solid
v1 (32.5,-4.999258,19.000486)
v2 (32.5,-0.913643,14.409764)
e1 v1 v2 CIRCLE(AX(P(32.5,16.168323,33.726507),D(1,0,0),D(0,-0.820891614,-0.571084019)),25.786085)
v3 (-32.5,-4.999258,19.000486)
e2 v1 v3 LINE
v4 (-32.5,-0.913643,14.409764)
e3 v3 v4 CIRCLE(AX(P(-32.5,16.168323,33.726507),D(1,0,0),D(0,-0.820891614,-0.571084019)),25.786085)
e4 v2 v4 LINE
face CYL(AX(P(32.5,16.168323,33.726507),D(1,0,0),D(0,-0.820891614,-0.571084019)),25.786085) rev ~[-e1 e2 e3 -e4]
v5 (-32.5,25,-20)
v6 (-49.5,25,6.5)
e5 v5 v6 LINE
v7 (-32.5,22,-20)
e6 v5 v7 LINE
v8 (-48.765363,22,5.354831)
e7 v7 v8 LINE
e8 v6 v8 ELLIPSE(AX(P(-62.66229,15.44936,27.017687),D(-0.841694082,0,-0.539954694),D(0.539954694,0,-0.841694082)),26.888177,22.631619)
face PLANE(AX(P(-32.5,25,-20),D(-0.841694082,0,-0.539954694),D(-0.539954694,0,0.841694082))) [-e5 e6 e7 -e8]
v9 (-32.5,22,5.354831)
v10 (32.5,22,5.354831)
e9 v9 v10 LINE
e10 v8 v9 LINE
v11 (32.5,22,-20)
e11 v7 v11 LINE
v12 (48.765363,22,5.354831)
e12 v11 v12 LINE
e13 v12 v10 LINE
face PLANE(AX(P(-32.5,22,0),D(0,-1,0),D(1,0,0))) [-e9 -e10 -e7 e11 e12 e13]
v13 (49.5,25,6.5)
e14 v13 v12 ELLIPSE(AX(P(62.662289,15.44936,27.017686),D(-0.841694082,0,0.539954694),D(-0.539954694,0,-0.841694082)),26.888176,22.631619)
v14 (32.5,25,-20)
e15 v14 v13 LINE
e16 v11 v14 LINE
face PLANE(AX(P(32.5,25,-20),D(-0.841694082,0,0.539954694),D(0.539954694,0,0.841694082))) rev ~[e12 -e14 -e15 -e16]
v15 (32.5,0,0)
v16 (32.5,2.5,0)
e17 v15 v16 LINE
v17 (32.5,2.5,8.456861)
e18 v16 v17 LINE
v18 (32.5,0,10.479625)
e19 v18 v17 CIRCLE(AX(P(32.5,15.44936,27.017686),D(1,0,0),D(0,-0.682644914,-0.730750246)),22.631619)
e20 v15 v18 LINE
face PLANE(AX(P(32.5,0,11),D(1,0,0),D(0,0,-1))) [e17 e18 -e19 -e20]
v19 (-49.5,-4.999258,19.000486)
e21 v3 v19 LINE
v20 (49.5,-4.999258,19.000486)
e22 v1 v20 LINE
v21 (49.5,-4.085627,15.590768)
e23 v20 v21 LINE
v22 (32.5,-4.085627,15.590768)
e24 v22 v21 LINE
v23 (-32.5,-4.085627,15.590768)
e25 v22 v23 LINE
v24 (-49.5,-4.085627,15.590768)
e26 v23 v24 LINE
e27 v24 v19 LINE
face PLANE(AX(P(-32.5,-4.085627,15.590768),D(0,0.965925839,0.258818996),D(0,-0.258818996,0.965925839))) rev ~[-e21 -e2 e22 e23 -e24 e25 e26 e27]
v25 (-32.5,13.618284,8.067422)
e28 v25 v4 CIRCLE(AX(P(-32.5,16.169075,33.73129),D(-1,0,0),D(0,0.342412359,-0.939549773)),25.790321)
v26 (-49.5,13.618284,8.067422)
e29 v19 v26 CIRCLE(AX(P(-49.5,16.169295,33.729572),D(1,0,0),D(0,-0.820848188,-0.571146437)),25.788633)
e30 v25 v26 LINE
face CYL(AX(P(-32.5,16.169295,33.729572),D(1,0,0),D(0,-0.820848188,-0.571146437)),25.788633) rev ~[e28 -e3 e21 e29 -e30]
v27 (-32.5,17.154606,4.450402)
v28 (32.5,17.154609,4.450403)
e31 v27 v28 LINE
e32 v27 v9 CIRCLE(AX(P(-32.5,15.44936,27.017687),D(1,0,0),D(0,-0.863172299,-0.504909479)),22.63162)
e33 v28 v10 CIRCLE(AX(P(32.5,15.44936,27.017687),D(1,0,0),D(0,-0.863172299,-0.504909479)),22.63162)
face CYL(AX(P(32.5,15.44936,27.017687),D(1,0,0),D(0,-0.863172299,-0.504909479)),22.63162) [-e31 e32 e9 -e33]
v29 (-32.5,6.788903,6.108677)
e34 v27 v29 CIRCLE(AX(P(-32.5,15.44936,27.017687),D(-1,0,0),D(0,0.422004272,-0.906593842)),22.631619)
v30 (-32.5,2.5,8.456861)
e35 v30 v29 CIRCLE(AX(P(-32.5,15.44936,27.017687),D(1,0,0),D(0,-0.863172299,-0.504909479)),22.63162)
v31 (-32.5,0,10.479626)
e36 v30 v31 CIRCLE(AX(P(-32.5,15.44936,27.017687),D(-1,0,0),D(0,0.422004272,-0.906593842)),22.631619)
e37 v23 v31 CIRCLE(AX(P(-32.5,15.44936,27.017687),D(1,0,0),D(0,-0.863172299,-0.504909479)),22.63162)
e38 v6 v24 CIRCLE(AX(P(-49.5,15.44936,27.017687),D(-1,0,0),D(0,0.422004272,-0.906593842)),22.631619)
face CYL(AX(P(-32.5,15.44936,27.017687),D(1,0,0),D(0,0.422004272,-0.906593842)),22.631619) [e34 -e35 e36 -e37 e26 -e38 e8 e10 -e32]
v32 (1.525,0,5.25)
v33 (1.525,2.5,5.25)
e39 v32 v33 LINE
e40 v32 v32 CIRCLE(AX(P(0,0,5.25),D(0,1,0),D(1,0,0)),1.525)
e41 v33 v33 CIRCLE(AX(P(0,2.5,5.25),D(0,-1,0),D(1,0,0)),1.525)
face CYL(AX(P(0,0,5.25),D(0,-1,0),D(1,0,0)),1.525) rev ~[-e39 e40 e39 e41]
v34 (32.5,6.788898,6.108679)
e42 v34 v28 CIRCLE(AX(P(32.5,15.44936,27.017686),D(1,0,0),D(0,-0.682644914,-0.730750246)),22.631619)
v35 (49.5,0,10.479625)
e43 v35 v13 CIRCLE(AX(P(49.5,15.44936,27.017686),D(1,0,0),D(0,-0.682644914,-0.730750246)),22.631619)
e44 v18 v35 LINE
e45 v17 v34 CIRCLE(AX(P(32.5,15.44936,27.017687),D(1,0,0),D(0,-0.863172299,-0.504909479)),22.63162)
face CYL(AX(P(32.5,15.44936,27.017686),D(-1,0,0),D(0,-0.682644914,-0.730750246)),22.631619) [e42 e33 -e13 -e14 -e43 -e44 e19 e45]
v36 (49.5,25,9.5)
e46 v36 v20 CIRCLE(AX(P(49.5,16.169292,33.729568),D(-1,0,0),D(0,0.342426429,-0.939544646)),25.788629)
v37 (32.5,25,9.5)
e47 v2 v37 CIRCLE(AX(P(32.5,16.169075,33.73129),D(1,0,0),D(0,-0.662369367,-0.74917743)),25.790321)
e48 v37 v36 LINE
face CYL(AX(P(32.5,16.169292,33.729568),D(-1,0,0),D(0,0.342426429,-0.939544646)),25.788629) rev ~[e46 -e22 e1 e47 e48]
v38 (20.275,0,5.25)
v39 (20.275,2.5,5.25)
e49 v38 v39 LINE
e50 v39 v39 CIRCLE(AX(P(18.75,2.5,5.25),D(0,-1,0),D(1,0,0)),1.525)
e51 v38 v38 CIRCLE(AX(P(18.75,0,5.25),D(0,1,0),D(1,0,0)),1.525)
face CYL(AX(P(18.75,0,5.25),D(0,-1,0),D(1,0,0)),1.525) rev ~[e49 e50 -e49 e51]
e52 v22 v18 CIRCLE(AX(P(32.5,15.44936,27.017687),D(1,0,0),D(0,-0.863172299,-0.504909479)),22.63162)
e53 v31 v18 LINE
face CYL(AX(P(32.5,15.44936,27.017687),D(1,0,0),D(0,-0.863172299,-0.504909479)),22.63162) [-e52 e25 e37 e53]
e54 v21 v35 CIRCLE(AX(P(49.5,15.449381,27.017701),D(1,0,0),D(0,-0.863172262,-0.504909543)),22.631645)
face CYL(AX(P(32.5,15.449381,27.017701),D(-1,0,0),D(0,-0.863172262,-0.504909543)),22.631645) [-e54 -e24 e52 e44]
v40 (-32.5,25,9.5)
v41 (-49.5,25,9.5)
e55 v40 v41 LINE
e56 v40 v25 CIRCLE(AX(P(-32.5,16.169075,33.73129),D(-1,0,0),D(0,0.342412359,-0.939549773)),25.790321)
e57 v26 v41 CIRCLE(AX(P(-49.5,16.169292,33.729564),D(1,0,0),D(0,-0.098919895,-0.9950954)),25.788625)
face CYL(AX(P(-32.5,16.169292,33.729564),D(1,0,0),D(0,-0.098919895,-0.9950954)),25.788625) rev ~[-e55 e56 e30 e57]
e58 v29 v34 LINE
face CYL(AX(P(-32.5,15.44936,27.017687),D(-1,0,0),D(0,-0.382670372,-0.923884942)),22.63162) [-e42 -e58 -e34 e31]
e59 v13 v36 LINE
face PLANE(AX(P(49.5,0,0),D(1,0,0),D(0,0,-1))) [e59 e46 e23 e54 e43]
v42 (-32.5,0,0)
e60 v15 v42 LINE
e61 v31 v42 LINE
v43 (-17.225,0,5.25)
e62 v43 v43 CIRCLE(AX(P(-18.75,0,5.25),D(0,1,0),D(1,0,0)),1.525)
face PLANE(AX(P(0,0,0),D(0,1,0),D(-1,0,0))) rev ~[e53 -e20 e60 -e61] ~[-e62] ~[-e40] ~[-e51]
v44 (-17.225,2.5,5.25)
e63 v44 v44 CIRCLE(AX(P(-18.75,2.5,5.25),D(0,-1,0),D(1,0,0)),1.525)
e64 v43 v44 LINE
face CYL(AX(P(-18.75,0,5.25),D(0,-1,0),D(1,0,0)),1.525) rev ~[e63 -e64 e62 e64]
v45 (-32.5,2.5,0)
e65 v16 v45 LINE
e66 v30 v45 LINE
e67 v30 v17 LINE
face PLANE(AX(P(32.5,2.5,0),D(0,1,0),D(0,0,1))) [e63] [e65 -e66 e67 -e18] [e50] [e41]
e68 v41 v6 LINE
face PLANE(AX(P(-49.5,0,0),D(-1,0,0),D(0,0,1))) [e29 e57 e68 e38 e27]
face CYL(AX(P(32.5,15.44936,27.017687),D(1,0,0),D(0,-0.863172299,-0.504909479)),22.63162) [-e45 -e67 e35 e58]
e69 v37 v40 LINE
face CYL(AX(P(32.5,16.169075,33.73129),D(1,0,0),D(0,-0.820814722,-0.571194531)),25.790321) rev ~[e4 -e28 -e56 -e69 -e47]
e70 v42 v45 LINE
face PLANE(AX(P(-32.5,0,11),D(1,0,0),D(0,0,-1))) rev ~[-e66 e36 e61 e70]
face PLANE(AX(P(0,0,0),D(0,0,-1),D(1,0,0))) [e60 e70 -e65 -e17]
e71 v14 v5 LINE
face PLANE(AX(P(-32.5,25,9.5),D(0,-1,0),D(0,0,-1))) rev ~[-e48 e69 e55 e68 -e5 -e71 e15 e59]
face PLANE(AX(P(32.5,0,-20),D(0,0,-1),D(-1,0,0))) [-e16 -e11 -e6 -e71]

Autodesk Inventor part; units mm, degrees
ref_plane "YZ Plane" through (0, 0, 0) normal (1, 0, 0) x (0, 1, 0)
ref_plane "XZ Plane" through (0, 0, 0) normal (0, 1, 0) x (-1, 0, 0)
ref_plane "XY Plane" through (0, 0, 0) normal (0, 0, 1) x (1, 0, 0)
sketch "Sketch1" plane through (0, 0, 0) normal (0, 1, 0) x (-1, 0, 0)
  line L0 (0, 0) -> (32.5, 0)
  line L1 (32.5, 0) -> (-32.5, 0)
  line L2 (-32.5, 0) -> (-32.5, 19)
  line L3 (-32.5, 19) -> (32.5, 19)
  line L4 (32.5, 19) -> (32.5, 0)
  dimension "d0" = 32.5
  dimension "d1" = 65
  dimension "d2" = 19
extrude "Extrusion1" add sketch "Sketch1" along normal blind 25
sketch "Sketch2" plane through (32.5, 0, 19) normal (1, 0, 0) x (0, 0, -1)
  line L0 (19, 0) -> (8, 0)
  line L1 (0, 0) -> (19, 0)
  line L2 (8, 0) -> (0, -2.143594)
  line L3 (0, -2.143594) -> (0, 0)
  dimension "d5" = 11
  dimension "d6" = 165
extrude "Extrusion2" add sketch "Sketch2" against normal up to surface (65 mm away)
sketch "Sketch3" plane through (32.5, 0, 0) normal (1, 0, 0) x (0, 0, -1)
  line L0 (-19, -2.143594) -> (-19, 25)
  line L1 (-19, 25) -> (0, 25)
  line L2 (-19, 25) -> (-19, -5)
  arc A0 (-19, -5) -> (-9.5, 25) centre (-33.73129, 16.169075) ccw
  line L3 (-19, -2.143594) -> (-11, 0)
  line L4 (-19, -5) -> (-11, 0)
  line L5 (-19, -2.143594) -> (-19, 25)
  line L6 (-19, 25) -> (-9.5, 25)
  point P0 (0, 0)
  point P1 (-14.409764, -0.913643)
  dimension "d59" = 30
extrude "Extrusion3" cut sketch "Sketch3" against normal blind 81.4375 contours L0 L1 A0 L3
sketch "Sketch4" plane through (0, 0, 0) normal (0, -1, 0) x (1, 0, 0)
  line L0 (-32.5, 0) -> (-32.5, 11) projected
  line L1 (-32.5, 0) -> (-32.5, 10.5)
  line L2 (-32.5, 10.5) -> (32.5, 10.5)
  line L3 (32.5, 11) -> (32.5, 0) projected
  line L4 (-32.5, 0) -> (-32.5, 5.25)
  line L5 (-32.5, 5.25) -> (32.5, 5.25)
  line L6 (-32.5, 5.25) -> (-18.75, 5.25)
  line L7 (-18.75, 5.25) -> (0, 5.25)
  line L8 (0, 5.25) -> (18.75, 5.25)
  line L9 (18.75, 5.25) -> (32.5, 5.25)
  circle A0 centre (18.75, 5.25) radius 1.525
  circle A1 centre (0, 5.25) radius 1.525
  circle A2 centre (-18.75, 5.25) radius 1.525
  point P0 (0, 0)
  point P1 (-17.225, 5.25)
  point P2 (-20.275, 5.25)
  point P3 (1.525, 5.25)
  point P4 (-1.525, 5.25)
  point P5 (20.275, 5.25)
  point P6 (17.225, 5.25)
  dimension "d12" = 10.5
  dimension "d13" = 5.25
  dimension "d14" = 13.75
  dimension "d15" = 18.75
  dimension "d16" = 18.75
  dimension "d17" = 3.05
  dimension "d18" = 3.05
  dimension "d19" = 3.05
extrude "Extrusion4" cut sketch "Sketch4" against normal blind 4 contours A2 L5 | L5 A2 | A1 L5 | L5 A1 | A0 L5 | L5 A0
sketch "Sketch5" plane through (32.5, 0, 0) normal (0, 0, -1) x (-1, 0, 0)
  line L0 (0, 25) -> (65, 25)
  line L1 (65, 25) -> (65, -2.143594)
  line L2 (0, 25) -> (65, 25)
  line L3 (65, 25) -> (65, 22)
  line L4 (65, 22) -> (0, 22)
  line L5 (0, 22) -> (0, 25)
  point P0 (32.5, 0)
  dimension "d22" = 3
sketch "Sketch6" plane through (32.5, 0, 0) normal (1, 0, 0) x (0, 0, -1)
  line L0 (0, 0) -> (-11, 0)
  line L1 (0, 0) -> (-10, 0)
  line L2 (-11, 0) -> (0, 0)
  line L3 (-19, 25) -> (0, 25)
  arc A0 (-11, 0) -> (-6.906688, 25) centre (-24.791662, 15.093247) ccw
  line L4 (0, 0) -> (0, 25)
  line L5 (0, 25) -> (0, 22)
  line L6 (0, 22) -> (-5.548149, 22)
  line L7 (0, 0) -> (0, 2.5)
  line L8 (0, 2.5) -> (-8.68495, 2.5)
  point P0 (-9.5, 25)
  dimension "d23" = 10
  dimension "d24" = 3
  dimension "d25" = 2.5
extrude "Extrusion5" cut sketch "Sketch6" against normal blind 113.5375 contours L8 A0 L6 L4
extrude "Extrusion6" add sketch "Sketch5" along normal blind 20
sketch "Sketch12" plane through (0, 25, 0) normal (0, 1, 0) x (1, 0, 0)
  line L0 (0, 0) -> (0, -9.5)
  line L1 (49.5, -9.5) -> (-49.5, -9.5)
  line L2 (0, -9.5) -> (0, 0)
  line L3 (0, -9.5) -> (0, -6)
  line L4 (0, -6) -> (8.228384, -6)
  line L5 (8.228384, -6) -> (-5.400421, -6)
  dimension "d85" = 3.5
sketch "Sketch14" plane through (32.5, 0, 11) normal (1, 0, 0) x (0, 0, -1)
  line L0 (11, 0) -> (0, 0)
  line L1 (0, 0) -> (9.434, 0) construction
  arc A0 (-3.409764, -0.913643) -> (1.5, 25) centre (-22.73129, 16.169075) ccw
  line L2 (1.5, 25) -> (31, 25)
  arc A1 (-8.000486, -4.999258) -> (1.5, 25) centre (-22.726506, 16.168322) ccw
  line L3 (-3.409764, -0.913643) -> (0, 0)
  line L4 (-3.409764, -0.913643) -> (0, 0)
  line L5 (-8.000486, -4.999258) -> (-4.590768, -4.085627)
  line L6 (-8.000486, -4.999258) -> (-4.470486, -4.999258) construction
  line L7 (-4.590768, -4.085627) -> (0, 0)
  point P0 (28, 25)
  point P1 (-2.386043, 0.31942)
  dimension "d60" = 9.434
  dimension "d62" = 3.53
  dimension "d63" = 15
extrude "Extrusion12" add sketch "Sketch14" against normal up to surface (65 mm away)
sketch "Sketch15" plane through (32.5, 0, 0) normal (1, 0, 0) x (0, 0, -1)
  arc A0 (-19.000486, -4.999258) -> (-13.386043, 0.31942) centre (-33.726506, 16.168322) ccw
  line L0 (-9.5, 25) -> (20, 25)
  arc A1 (-19.000486, -4.999258) -> (-9.5, 25) centre (-33.729569, 16.169292) ccw
  line L1 (-9.5, 25) -> (-6.5, 25)
  line L2 (-19.000486, -4.999258) -> (-15.590768, -4.085627)
  arc A2 (-15.590768, -4.085627) -> (-6.5, 25) centre (-27.017687, 15.44936) ccw
  line L3 (-15.590768, -4.085627) -> (-11, 0)
  line L4 (-19.000486, -4.999258) -> (-15.590768, -4.085627)
  line L5 (-9.5, 25) -> (-6.5, 25)
  line L6 (-9.5, 25) -> (20, 25)
  point P0 (0, 0)
  point P1 (17, 25)
  dimension "d66" = 3
extrude "Extrusion13" add sketch "Sketch15" against normal blind 65
sketch "Sketch16" plane through (32.5, 0, 0) normal (1, 0, 0) x (0, 0, -1)
  line L0 (-19.000486, -4.999258) -> (-15.590768, -4.085627)
  arc A0 (-8.067422, 13.618284) -> (-9.5, 25) centre (-33.73129, 16.169075) ccw
  arc A1 (-19.000486, -4.999258) -> (-9.5, 25) centre (-33.729569, 16.169292) ccw
  line L1 (-9.5, 25) -> (20, 25)
  line L2 (-9.5, 25) -> (-6.5, 25)
  arc A2 (-15.590768, -4.085627) -> (-10.479625, 0) centre (-27.017687, 15.44936) ccw
  arc A3 (-6.108674, 6.78891) -> (-4.450402, 17.154601) centre (-24.791662, 15.093247) ccw
  arc A4 (-15.590768, -4.085627) -> (-6.5, 25) centre (-27.017687, 15.44936) ccw
  line L3 (-19.000486, -4.999258) -> (-15.590768, -4.085627)
  line L4 (-9.5, 25) -> (-6.5, 25)
  point P0 (0, 0)
  point P1 (17, 25)
  point P2 (-10.479625, 0)
  dimension "d69" = 3
sketch "Sketch16 outline for Extrusion14" plane through (32.5, 0, 0) normal (1, 0, 0) x (0, 0, -1)
  arc A0 (-10.479625, 0) -> (-6.5, 25) centre (-27.017687, 15.44936) ccw
  arc A1 (-15.590768, -4.085627) -> (-10.479625, 0) centre (-27.017687, 15.44936) ccw
  line L0 (-19.000486, -4.999258) -> (-15.590768, -4.085627)
  arc A2 (-9.5, 25) -> (-19.000486, -4.999258) centre (-33.729569, 16.169292) cw
  line L1 (-6.5, 25) -> (-9.5, 25)
extrude "Extrusion14" add sketch "Sketch16 outline for Extrusion14" along normal blind 17
sketch "Sketch17" plane through (-32.5, 0, 0) normal (-1, 0, 0) x (0, 0, 1)
  line L0 (9.5, 25) -> (-20, 25)
  line L1 (19.000486, -4.999258) -> (15.590768, -4.085627)
  arc A0 (8.067422, 13.618284) -> (19.000486, -4.999258) centre (33.729569, 16.169292) ccw
  arc A1 (9.5, 25) -> (19.000486, -4.999258) centre (33.729569, 16.169292) ccw
  line L2 (9.5, 25) -> (6.5, 25)
  arc A2 (4.450402, 17.154601) -> (6.108674, 6.78891) centre (24.791662, 15.093247) ccw
  arc A3 (6.5, 25) -> (15.590768, -4.085627) centre (27.017687, 15.44936) ccw
  line L3 (15.590768, -4.085627) -> (19.000486, -4.999258)
  point P0 (0, 0)
  point P1 (-17, 25)
  dimension "d72" = 3
sketch "Sketch17 outline for Extrusion15" plane through (-32.5, 0, 0) normal (-1, 0, 0) x (0, 0, 1)
  arc A0 (6.5, 25) -> (15.590768, -4.085627) centre (27.017687, 15.44936) ccw
  line L0 (9.5, 25) -> (6.5, 25)
  arc A1 (8.067422, 13.618284) -> (9.5, 25) centre (33.729569, 16.169292) cw
  arc A2 (19.000486, -4.999258) -> (8.067422, 13.618284) centre (33.729569, 16.169292) cw
  line L1 (15.590768, -4.085627) -> (19.000486, -4.999258)
extrude "Extrusion15" add sketch "Sketch17 outline for Extrusion15" along normal blind 17
sketch "Sketch18" plane through (-32.5, 15.093247, 24.791662) normal (-1, 0, 0) x (0, 0.1579684, 0.9874442)
  arc A0 (-16.497042, 12.67187) -> (-18.101737, 9.890438) centre (2.25433, 0) ccw
  arc A1 (-18.11904, -9.854746) -> (-16.516593, -12.64289) centre (2.25433, 0) ccw
  arc A2 (-18.101737, 9.890438) -> (-18.11904, -9.854746) centre (2.25433, 0) ccw
  arc A3 (-19.76023, 5.248748) -> (-19.76023, -5.248748) centre (2.25433, 0) ccw
  arc A4 (-19.76023, 5.248748) -> (-19.76023, -5.248748) centre (0, 0) ccw
  point P0 (-26.864638, -10.98744)
sketch "Sketch18 outline for Extrusion16" plane through (-32.5, 15.093247, 24.791662) normal (-1, 0, 0) x (0, 0.1579684, 0.9874442)
  arc A0 (-19.76023, 5.248748) -> (-19.76023, -5.248748) centre (0, 0) ccw
  arc A1 (-19.76023, -5.248748) -> (-19.76023, 5.248748) centre (2.25433, 0) cw
extrude "Extrusion16" cut sketch "Sketch18 outline for Extrusion16" against normal blind 66.2125
sketch "Sketch20" plane through (0, 25, 0) normal (0, 1, 0) x (1, 0, 0)
  arc A0 (32.5, 17) -> (29.5, 20) centre (29.5, 17) ccw
  line L0 (32.5, -6.5) -> (49.5, -6.5)
  line L1 (-32.5, 20) -> (-32.5, -5.354831)
  line L2 (49.5, -6.5) -> (32.5, -6.5)
  line L3 (-32.5, -6.5) -> (-32.5, -5.354831)
  line L4 (-32.5, 17) -> (-32.5, -6.5)
  line L5 (-32.5, -6.5) -> (-49.5, -6.5)
  line L6 (32.5, -6.5) -> (32.5, 20)
  line L7 (32.5, 17) -> (32.5, -6.5)
  line L8 (32.5, 20) -> (49.5, -6.5)
  line L9 (-32.5, 20) -> (32.5, 20)
  line L10 (-32.5, 20) -> (-49.5, -6.5)
  point P0 (0, 0)
sketch "Sketch21" plane through (-49.5, 0, 0) normal (-1, 0, 0) x (0, 0, 1)
  arc A0 (9.5, 25) -> (19.000486, -4.999258) centre (33.729569, 16.169292) ccw
  line L0 (9.5, 25) -> (19.000486, -4.999258)
  point P0 (0, 0)
extrude "Extrusion18" cut sketch "Sketch21" against normal blind 124.3
extrude "Extrusion19" add sketch "Sketch20" against normal up to surface (3 mm away) contours L6 L8 L0 | L1 L3 L5 L10
properties part number "slope"
